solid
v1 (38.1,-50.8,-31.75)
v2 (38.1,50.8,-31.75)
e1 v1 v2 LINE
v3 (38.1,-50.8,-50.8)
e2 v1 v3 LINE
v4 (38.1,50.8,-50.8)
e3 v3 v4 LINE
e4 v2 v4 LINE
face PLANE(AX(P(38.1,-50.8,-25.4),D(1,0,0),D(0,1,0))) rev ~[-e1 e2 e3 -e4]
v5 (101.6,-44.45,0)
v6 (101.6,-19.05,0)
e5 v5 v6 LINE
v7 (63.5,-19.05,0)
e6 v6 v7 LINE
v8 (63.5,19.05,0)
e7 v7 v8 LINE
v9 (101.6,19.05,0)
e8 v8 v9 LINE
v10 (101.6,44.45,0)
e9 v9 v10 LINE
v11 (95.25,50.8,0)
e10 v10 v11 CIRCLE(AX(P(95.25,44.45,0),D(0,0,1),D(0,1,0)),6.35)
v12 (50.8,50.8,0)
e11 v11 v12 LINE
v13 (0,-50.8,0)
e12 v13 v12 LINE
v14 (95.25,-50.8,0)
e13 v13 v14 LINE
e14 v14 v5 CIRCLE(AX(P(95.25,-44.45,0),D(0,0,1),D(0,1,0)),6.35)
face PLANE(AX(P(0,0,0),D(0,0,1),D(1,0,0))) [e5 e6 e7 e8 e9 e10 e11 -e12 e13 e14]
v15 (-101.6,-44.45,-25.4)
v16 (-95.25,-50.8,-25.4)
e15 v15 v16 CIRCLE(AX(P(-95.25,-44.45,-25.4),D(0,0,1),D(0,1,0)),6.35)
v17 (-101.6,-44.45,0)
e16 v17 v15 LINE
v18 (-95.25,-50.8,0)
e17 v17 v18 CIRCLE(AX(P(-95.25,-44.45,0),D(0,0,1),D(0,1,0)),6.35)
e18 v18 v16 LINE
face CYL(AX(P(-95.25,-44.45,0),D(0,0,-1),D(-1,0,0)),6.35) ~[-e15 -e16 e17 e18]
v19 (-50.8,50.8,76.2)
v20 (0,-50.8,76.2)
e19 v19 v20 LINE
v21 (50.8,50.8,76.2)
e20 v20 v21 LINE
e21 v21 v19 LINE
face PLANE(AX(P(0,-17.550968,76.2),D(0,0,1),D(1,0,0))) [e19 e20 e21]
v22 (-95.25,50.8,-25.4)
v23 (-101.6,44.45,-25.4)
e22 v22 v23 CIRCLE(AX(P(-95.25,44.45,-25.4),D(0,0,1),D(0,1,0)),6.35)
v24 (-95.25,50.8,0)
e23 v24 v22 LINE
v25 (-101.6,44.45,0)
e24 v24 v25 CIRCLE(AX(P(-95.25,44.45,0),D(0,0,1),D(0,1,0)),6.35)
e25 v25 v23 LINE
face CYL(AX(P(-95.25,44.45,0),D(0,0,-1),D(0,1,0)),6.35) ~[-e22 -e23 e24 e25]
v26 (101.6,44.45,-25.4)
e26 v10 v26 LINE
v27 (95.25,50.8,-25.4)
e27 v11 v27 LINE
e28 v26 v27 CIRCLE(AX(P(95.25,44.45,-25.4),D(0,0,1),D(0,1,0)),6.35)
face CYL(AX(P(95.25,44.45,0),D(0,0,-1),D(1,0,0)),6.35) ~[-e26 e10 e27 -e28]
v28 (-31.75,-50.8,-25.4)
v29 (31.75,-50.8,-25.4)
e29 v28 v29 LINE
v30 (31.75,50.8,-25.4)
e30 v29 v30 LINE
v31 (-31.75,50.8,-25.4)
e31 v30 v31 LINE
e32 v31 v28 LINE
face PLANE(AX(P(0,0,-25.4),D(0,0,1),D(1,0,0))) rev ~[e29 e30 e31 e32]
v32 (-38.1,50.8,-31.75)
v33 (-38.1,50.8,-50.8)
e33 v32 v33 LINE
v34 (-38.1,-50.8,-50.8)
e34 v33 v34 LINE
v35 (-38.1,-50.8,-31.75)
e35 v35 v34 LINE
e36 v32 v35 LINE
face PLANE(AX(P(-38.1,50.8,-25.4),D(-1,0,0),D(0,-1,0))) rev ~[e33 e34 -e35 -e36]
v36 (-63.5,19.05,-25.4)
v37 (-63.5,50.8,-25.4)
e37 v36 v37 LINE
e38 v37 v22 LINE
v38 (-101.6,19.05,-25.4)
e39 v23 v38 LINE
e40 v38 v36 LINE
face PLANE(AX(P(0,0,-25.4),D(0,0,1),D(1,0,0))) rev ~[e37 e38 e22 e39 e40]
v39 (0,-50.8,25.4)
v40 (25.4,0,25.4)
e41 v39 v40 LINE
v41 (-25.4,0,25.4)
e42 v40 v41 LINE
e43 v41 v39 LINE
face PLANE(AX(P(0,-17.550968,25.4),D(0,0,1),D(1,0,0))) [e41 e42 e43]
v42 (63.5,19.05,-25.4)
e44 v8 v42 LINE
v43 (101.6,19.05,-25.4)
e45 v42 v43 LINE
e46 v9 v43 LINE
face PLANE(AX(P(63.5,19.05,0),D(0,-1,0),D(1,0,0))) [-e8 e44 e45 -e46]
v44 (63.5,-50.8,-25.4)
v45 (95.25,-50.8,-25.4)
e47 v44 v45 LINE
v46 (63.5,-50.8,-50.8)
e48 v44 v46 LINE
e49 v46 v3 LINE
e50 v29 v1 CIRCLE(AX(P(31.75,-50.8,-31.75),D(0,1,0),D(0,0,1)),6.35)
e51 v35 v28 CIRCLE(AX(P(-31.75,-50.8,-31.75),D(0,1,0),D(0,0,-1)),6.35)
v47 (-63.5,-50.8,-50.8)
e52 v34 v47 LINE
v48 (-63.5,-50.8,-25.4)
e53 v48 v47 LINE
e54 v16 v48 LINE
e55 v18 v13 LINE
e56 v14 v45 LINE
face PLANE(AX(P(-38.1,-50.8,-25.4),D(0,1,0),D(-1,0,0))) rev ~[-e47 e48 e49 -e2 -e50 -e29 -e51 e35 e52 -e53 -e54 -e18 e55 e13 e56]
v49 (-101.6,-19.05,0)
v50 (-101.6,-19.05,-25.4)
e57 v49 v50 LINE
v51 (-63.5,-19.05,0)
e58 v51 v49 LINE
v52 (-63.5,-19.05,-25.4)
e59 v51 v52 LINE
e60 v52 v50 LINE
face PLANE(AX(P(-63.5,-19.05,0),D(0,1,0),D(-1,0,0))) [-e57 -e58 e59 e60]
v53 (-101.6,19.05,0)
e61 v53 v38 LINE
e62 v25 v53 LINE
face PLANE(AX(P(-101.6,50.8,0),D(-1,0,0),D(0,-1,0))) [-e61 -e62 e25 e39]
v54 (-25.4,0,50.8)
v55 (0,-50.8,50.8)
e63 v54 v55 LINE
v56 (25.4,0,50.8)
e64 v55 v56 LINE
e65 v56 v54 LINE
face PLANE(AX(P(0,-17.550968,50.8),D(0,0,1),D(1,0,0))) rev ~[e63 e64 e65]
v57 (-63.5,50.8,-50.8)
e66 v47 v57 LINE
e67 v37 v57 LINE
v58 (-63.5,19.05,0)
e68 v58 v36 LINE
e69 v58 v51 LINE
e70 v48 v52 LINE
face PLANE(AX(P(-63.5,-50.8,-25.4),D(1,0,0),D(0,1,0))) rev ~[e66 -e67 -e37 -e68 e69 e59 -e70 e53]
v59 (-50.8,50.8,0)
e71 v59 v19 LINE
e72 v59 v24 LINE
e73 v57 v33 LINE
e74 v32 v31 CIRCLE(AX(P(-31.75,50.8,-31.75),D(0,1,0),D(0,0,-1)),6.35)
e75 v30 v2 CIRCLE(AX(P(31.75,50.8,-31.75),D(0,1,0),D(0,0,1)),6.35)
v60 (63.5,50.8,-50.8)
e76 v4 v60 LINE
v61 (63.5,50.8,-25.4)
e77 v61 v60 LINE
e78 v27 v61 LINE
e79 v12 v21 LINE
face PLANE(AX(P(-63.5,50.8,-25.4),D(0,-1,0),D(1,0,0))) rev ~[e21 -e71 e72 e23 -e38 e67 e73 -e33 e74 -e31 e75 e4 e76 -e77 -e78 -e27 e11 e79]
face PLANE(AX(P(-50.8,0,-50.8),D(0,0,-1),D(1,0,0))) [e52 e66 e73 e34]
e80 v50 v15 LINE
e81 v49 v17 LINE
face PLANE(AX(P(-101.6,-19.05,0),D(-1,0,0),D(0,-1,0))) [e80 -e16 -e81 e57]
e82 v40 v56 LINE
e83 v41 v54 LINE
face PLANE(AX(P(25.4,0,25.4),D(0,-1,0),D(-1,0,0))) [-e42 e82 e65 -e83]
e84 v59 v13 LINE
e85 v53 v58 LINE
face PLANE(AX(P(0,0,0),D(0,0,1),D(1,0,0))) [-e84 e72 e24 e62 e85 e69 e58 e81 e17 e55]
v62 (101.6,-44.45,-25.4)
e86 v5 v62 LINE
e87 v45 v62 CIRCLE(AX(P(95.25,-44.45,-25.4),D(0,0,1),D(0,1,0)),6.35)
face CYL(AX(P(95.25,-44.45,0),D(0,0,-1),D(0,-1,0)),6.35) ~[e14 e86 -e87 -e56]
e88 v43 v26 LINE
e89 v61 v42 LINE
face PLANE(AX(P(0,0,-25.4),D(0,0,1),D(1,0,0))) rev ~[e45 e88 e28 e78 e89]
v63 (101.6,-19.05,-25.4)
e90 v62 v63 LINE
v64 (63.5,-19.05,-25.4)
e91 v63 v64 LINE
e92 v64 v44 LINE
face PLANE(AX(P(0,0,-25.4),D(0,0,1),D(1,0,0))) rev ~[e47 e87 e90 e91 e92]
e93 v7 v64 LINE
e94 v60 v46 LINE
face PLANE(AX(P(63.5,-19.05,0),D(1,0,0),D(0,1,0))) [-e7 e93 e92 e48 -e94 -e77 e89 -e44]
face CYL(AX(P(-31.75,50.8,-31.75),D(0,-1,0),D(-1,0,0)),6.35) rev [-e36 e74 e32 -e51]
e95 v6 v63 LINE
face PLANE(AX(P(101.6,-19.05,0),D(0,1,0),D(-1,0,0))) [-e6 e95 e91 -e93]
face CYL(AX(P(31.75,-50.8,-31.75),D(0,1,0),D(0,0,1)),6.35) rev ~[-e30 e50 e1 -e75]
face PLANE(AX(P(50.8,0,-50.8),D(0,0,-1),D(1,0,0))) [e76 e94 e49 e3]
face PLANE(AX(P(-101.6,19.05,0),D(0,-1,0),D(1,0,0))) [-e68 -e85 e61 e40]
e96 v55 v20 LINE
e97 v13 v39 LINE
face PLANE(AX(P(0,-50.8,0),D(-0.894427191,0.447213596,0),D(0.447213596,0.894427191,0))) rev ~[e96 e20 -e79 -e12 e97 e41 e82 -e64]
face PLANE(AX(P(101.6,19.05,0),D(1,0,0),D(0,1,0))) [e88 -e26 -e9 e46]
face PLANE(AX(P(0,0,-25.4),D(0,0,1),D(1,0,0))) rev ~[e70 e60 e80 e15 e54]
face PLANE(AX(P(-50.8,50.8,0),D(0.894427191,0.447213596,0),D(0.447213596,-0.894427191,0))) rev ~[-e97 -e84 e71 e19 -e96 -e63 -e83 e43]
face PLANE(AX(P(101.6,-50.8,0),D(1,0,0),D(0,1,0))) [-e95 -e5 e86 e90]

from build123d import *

# Parameters (mm, degrees)
F1_DEPTH = 25.4
F2_R     = 6.35
F4_DEPTH = 25.4
F5_R     = 6.35
F7_DEPTH = 76.2
F8_START = 25.4
F8_DEPTH = 25.4


with BuildPart() as f1:
    # F0 (on Top) → F1 (new body)
    with BuildSketch(Plane.XY):
        Polygon((-101.6, 19.05), (-63.5, 19.05), (-63.5, -19.05), (-101.6, -19.05), (-101.6, -50.8), (101.6, -50.8), (101.6, -19.05), (63.5, -19.05), (63.5, 19.05), (101.6, 19.05), (101.6, 50.8), (-101.6, 50.8), align=None)
    extrude(amount=-F1_DEPTH)

    # F2
    f2_edges = [f1.edges().sort_by_distance(p)[0] for p in [
        (-101.6, -50.8, -12.7),
        (101.6, -50.8, -12.7),
        (101.6, 50.8, -12.7),
        (-101.6, 50.8, -12.7),
    ]]
    fillet(f2_edges, radius=F2_R)

    # F3 (on face) → F4 (join)
    with BuildSketch(Plane(origin=(0, 0, -25.4), x_dir=(1, 0, 0), z_dir=(0, 0, -1))):
        Polygon((-38.1, -50.8), (-38.1, 50.8), (-63.5, 50.8), (-63.5, 19.05), (-63.5, -19.05), (-63.5, -50.8), align=None)
        Polygon((63.5, -19.05), (63.5, 19.05), (63.5, 50.8), (38.1, 50.8), (38.1, -50.8), (63.5, -50.8), align=None)
    extrude(amount=F4_DEPTH)

    # F5
    f5_edges = [f1.edges().sort_by_distance(p)[0] for p in [
        (-38.1, 0, -25.4),
        (38.1, 0, -25.4),
    ]]
    fillet(f5_edges, radius=F5_R)

    # F6 (on face) → F7 (join)
    with BuildSketch(Plane.XY):
        Polygon((-25.4, 0), (0, -50.8), (25.4, 0), (0, 0), align=None)
        Polygon((-50.8, 50.8), (-25.4, 0), (0, 0), (25.4, 0), (50.8, 50.8), align=None)
    extrude(amount=F7_DEPTH)

    # F6 (on face) → F8 (cut)
    with BuildSketch(Plane.XY.offset(F8_START)):
        Polygon((-25.4, 0), (0, -50.8), (25.4, 0), (0, 0), align=None)
    extrude(amount=F8_DEPTH, mode=Mode.SUBTRACT)


solid = f1.part
